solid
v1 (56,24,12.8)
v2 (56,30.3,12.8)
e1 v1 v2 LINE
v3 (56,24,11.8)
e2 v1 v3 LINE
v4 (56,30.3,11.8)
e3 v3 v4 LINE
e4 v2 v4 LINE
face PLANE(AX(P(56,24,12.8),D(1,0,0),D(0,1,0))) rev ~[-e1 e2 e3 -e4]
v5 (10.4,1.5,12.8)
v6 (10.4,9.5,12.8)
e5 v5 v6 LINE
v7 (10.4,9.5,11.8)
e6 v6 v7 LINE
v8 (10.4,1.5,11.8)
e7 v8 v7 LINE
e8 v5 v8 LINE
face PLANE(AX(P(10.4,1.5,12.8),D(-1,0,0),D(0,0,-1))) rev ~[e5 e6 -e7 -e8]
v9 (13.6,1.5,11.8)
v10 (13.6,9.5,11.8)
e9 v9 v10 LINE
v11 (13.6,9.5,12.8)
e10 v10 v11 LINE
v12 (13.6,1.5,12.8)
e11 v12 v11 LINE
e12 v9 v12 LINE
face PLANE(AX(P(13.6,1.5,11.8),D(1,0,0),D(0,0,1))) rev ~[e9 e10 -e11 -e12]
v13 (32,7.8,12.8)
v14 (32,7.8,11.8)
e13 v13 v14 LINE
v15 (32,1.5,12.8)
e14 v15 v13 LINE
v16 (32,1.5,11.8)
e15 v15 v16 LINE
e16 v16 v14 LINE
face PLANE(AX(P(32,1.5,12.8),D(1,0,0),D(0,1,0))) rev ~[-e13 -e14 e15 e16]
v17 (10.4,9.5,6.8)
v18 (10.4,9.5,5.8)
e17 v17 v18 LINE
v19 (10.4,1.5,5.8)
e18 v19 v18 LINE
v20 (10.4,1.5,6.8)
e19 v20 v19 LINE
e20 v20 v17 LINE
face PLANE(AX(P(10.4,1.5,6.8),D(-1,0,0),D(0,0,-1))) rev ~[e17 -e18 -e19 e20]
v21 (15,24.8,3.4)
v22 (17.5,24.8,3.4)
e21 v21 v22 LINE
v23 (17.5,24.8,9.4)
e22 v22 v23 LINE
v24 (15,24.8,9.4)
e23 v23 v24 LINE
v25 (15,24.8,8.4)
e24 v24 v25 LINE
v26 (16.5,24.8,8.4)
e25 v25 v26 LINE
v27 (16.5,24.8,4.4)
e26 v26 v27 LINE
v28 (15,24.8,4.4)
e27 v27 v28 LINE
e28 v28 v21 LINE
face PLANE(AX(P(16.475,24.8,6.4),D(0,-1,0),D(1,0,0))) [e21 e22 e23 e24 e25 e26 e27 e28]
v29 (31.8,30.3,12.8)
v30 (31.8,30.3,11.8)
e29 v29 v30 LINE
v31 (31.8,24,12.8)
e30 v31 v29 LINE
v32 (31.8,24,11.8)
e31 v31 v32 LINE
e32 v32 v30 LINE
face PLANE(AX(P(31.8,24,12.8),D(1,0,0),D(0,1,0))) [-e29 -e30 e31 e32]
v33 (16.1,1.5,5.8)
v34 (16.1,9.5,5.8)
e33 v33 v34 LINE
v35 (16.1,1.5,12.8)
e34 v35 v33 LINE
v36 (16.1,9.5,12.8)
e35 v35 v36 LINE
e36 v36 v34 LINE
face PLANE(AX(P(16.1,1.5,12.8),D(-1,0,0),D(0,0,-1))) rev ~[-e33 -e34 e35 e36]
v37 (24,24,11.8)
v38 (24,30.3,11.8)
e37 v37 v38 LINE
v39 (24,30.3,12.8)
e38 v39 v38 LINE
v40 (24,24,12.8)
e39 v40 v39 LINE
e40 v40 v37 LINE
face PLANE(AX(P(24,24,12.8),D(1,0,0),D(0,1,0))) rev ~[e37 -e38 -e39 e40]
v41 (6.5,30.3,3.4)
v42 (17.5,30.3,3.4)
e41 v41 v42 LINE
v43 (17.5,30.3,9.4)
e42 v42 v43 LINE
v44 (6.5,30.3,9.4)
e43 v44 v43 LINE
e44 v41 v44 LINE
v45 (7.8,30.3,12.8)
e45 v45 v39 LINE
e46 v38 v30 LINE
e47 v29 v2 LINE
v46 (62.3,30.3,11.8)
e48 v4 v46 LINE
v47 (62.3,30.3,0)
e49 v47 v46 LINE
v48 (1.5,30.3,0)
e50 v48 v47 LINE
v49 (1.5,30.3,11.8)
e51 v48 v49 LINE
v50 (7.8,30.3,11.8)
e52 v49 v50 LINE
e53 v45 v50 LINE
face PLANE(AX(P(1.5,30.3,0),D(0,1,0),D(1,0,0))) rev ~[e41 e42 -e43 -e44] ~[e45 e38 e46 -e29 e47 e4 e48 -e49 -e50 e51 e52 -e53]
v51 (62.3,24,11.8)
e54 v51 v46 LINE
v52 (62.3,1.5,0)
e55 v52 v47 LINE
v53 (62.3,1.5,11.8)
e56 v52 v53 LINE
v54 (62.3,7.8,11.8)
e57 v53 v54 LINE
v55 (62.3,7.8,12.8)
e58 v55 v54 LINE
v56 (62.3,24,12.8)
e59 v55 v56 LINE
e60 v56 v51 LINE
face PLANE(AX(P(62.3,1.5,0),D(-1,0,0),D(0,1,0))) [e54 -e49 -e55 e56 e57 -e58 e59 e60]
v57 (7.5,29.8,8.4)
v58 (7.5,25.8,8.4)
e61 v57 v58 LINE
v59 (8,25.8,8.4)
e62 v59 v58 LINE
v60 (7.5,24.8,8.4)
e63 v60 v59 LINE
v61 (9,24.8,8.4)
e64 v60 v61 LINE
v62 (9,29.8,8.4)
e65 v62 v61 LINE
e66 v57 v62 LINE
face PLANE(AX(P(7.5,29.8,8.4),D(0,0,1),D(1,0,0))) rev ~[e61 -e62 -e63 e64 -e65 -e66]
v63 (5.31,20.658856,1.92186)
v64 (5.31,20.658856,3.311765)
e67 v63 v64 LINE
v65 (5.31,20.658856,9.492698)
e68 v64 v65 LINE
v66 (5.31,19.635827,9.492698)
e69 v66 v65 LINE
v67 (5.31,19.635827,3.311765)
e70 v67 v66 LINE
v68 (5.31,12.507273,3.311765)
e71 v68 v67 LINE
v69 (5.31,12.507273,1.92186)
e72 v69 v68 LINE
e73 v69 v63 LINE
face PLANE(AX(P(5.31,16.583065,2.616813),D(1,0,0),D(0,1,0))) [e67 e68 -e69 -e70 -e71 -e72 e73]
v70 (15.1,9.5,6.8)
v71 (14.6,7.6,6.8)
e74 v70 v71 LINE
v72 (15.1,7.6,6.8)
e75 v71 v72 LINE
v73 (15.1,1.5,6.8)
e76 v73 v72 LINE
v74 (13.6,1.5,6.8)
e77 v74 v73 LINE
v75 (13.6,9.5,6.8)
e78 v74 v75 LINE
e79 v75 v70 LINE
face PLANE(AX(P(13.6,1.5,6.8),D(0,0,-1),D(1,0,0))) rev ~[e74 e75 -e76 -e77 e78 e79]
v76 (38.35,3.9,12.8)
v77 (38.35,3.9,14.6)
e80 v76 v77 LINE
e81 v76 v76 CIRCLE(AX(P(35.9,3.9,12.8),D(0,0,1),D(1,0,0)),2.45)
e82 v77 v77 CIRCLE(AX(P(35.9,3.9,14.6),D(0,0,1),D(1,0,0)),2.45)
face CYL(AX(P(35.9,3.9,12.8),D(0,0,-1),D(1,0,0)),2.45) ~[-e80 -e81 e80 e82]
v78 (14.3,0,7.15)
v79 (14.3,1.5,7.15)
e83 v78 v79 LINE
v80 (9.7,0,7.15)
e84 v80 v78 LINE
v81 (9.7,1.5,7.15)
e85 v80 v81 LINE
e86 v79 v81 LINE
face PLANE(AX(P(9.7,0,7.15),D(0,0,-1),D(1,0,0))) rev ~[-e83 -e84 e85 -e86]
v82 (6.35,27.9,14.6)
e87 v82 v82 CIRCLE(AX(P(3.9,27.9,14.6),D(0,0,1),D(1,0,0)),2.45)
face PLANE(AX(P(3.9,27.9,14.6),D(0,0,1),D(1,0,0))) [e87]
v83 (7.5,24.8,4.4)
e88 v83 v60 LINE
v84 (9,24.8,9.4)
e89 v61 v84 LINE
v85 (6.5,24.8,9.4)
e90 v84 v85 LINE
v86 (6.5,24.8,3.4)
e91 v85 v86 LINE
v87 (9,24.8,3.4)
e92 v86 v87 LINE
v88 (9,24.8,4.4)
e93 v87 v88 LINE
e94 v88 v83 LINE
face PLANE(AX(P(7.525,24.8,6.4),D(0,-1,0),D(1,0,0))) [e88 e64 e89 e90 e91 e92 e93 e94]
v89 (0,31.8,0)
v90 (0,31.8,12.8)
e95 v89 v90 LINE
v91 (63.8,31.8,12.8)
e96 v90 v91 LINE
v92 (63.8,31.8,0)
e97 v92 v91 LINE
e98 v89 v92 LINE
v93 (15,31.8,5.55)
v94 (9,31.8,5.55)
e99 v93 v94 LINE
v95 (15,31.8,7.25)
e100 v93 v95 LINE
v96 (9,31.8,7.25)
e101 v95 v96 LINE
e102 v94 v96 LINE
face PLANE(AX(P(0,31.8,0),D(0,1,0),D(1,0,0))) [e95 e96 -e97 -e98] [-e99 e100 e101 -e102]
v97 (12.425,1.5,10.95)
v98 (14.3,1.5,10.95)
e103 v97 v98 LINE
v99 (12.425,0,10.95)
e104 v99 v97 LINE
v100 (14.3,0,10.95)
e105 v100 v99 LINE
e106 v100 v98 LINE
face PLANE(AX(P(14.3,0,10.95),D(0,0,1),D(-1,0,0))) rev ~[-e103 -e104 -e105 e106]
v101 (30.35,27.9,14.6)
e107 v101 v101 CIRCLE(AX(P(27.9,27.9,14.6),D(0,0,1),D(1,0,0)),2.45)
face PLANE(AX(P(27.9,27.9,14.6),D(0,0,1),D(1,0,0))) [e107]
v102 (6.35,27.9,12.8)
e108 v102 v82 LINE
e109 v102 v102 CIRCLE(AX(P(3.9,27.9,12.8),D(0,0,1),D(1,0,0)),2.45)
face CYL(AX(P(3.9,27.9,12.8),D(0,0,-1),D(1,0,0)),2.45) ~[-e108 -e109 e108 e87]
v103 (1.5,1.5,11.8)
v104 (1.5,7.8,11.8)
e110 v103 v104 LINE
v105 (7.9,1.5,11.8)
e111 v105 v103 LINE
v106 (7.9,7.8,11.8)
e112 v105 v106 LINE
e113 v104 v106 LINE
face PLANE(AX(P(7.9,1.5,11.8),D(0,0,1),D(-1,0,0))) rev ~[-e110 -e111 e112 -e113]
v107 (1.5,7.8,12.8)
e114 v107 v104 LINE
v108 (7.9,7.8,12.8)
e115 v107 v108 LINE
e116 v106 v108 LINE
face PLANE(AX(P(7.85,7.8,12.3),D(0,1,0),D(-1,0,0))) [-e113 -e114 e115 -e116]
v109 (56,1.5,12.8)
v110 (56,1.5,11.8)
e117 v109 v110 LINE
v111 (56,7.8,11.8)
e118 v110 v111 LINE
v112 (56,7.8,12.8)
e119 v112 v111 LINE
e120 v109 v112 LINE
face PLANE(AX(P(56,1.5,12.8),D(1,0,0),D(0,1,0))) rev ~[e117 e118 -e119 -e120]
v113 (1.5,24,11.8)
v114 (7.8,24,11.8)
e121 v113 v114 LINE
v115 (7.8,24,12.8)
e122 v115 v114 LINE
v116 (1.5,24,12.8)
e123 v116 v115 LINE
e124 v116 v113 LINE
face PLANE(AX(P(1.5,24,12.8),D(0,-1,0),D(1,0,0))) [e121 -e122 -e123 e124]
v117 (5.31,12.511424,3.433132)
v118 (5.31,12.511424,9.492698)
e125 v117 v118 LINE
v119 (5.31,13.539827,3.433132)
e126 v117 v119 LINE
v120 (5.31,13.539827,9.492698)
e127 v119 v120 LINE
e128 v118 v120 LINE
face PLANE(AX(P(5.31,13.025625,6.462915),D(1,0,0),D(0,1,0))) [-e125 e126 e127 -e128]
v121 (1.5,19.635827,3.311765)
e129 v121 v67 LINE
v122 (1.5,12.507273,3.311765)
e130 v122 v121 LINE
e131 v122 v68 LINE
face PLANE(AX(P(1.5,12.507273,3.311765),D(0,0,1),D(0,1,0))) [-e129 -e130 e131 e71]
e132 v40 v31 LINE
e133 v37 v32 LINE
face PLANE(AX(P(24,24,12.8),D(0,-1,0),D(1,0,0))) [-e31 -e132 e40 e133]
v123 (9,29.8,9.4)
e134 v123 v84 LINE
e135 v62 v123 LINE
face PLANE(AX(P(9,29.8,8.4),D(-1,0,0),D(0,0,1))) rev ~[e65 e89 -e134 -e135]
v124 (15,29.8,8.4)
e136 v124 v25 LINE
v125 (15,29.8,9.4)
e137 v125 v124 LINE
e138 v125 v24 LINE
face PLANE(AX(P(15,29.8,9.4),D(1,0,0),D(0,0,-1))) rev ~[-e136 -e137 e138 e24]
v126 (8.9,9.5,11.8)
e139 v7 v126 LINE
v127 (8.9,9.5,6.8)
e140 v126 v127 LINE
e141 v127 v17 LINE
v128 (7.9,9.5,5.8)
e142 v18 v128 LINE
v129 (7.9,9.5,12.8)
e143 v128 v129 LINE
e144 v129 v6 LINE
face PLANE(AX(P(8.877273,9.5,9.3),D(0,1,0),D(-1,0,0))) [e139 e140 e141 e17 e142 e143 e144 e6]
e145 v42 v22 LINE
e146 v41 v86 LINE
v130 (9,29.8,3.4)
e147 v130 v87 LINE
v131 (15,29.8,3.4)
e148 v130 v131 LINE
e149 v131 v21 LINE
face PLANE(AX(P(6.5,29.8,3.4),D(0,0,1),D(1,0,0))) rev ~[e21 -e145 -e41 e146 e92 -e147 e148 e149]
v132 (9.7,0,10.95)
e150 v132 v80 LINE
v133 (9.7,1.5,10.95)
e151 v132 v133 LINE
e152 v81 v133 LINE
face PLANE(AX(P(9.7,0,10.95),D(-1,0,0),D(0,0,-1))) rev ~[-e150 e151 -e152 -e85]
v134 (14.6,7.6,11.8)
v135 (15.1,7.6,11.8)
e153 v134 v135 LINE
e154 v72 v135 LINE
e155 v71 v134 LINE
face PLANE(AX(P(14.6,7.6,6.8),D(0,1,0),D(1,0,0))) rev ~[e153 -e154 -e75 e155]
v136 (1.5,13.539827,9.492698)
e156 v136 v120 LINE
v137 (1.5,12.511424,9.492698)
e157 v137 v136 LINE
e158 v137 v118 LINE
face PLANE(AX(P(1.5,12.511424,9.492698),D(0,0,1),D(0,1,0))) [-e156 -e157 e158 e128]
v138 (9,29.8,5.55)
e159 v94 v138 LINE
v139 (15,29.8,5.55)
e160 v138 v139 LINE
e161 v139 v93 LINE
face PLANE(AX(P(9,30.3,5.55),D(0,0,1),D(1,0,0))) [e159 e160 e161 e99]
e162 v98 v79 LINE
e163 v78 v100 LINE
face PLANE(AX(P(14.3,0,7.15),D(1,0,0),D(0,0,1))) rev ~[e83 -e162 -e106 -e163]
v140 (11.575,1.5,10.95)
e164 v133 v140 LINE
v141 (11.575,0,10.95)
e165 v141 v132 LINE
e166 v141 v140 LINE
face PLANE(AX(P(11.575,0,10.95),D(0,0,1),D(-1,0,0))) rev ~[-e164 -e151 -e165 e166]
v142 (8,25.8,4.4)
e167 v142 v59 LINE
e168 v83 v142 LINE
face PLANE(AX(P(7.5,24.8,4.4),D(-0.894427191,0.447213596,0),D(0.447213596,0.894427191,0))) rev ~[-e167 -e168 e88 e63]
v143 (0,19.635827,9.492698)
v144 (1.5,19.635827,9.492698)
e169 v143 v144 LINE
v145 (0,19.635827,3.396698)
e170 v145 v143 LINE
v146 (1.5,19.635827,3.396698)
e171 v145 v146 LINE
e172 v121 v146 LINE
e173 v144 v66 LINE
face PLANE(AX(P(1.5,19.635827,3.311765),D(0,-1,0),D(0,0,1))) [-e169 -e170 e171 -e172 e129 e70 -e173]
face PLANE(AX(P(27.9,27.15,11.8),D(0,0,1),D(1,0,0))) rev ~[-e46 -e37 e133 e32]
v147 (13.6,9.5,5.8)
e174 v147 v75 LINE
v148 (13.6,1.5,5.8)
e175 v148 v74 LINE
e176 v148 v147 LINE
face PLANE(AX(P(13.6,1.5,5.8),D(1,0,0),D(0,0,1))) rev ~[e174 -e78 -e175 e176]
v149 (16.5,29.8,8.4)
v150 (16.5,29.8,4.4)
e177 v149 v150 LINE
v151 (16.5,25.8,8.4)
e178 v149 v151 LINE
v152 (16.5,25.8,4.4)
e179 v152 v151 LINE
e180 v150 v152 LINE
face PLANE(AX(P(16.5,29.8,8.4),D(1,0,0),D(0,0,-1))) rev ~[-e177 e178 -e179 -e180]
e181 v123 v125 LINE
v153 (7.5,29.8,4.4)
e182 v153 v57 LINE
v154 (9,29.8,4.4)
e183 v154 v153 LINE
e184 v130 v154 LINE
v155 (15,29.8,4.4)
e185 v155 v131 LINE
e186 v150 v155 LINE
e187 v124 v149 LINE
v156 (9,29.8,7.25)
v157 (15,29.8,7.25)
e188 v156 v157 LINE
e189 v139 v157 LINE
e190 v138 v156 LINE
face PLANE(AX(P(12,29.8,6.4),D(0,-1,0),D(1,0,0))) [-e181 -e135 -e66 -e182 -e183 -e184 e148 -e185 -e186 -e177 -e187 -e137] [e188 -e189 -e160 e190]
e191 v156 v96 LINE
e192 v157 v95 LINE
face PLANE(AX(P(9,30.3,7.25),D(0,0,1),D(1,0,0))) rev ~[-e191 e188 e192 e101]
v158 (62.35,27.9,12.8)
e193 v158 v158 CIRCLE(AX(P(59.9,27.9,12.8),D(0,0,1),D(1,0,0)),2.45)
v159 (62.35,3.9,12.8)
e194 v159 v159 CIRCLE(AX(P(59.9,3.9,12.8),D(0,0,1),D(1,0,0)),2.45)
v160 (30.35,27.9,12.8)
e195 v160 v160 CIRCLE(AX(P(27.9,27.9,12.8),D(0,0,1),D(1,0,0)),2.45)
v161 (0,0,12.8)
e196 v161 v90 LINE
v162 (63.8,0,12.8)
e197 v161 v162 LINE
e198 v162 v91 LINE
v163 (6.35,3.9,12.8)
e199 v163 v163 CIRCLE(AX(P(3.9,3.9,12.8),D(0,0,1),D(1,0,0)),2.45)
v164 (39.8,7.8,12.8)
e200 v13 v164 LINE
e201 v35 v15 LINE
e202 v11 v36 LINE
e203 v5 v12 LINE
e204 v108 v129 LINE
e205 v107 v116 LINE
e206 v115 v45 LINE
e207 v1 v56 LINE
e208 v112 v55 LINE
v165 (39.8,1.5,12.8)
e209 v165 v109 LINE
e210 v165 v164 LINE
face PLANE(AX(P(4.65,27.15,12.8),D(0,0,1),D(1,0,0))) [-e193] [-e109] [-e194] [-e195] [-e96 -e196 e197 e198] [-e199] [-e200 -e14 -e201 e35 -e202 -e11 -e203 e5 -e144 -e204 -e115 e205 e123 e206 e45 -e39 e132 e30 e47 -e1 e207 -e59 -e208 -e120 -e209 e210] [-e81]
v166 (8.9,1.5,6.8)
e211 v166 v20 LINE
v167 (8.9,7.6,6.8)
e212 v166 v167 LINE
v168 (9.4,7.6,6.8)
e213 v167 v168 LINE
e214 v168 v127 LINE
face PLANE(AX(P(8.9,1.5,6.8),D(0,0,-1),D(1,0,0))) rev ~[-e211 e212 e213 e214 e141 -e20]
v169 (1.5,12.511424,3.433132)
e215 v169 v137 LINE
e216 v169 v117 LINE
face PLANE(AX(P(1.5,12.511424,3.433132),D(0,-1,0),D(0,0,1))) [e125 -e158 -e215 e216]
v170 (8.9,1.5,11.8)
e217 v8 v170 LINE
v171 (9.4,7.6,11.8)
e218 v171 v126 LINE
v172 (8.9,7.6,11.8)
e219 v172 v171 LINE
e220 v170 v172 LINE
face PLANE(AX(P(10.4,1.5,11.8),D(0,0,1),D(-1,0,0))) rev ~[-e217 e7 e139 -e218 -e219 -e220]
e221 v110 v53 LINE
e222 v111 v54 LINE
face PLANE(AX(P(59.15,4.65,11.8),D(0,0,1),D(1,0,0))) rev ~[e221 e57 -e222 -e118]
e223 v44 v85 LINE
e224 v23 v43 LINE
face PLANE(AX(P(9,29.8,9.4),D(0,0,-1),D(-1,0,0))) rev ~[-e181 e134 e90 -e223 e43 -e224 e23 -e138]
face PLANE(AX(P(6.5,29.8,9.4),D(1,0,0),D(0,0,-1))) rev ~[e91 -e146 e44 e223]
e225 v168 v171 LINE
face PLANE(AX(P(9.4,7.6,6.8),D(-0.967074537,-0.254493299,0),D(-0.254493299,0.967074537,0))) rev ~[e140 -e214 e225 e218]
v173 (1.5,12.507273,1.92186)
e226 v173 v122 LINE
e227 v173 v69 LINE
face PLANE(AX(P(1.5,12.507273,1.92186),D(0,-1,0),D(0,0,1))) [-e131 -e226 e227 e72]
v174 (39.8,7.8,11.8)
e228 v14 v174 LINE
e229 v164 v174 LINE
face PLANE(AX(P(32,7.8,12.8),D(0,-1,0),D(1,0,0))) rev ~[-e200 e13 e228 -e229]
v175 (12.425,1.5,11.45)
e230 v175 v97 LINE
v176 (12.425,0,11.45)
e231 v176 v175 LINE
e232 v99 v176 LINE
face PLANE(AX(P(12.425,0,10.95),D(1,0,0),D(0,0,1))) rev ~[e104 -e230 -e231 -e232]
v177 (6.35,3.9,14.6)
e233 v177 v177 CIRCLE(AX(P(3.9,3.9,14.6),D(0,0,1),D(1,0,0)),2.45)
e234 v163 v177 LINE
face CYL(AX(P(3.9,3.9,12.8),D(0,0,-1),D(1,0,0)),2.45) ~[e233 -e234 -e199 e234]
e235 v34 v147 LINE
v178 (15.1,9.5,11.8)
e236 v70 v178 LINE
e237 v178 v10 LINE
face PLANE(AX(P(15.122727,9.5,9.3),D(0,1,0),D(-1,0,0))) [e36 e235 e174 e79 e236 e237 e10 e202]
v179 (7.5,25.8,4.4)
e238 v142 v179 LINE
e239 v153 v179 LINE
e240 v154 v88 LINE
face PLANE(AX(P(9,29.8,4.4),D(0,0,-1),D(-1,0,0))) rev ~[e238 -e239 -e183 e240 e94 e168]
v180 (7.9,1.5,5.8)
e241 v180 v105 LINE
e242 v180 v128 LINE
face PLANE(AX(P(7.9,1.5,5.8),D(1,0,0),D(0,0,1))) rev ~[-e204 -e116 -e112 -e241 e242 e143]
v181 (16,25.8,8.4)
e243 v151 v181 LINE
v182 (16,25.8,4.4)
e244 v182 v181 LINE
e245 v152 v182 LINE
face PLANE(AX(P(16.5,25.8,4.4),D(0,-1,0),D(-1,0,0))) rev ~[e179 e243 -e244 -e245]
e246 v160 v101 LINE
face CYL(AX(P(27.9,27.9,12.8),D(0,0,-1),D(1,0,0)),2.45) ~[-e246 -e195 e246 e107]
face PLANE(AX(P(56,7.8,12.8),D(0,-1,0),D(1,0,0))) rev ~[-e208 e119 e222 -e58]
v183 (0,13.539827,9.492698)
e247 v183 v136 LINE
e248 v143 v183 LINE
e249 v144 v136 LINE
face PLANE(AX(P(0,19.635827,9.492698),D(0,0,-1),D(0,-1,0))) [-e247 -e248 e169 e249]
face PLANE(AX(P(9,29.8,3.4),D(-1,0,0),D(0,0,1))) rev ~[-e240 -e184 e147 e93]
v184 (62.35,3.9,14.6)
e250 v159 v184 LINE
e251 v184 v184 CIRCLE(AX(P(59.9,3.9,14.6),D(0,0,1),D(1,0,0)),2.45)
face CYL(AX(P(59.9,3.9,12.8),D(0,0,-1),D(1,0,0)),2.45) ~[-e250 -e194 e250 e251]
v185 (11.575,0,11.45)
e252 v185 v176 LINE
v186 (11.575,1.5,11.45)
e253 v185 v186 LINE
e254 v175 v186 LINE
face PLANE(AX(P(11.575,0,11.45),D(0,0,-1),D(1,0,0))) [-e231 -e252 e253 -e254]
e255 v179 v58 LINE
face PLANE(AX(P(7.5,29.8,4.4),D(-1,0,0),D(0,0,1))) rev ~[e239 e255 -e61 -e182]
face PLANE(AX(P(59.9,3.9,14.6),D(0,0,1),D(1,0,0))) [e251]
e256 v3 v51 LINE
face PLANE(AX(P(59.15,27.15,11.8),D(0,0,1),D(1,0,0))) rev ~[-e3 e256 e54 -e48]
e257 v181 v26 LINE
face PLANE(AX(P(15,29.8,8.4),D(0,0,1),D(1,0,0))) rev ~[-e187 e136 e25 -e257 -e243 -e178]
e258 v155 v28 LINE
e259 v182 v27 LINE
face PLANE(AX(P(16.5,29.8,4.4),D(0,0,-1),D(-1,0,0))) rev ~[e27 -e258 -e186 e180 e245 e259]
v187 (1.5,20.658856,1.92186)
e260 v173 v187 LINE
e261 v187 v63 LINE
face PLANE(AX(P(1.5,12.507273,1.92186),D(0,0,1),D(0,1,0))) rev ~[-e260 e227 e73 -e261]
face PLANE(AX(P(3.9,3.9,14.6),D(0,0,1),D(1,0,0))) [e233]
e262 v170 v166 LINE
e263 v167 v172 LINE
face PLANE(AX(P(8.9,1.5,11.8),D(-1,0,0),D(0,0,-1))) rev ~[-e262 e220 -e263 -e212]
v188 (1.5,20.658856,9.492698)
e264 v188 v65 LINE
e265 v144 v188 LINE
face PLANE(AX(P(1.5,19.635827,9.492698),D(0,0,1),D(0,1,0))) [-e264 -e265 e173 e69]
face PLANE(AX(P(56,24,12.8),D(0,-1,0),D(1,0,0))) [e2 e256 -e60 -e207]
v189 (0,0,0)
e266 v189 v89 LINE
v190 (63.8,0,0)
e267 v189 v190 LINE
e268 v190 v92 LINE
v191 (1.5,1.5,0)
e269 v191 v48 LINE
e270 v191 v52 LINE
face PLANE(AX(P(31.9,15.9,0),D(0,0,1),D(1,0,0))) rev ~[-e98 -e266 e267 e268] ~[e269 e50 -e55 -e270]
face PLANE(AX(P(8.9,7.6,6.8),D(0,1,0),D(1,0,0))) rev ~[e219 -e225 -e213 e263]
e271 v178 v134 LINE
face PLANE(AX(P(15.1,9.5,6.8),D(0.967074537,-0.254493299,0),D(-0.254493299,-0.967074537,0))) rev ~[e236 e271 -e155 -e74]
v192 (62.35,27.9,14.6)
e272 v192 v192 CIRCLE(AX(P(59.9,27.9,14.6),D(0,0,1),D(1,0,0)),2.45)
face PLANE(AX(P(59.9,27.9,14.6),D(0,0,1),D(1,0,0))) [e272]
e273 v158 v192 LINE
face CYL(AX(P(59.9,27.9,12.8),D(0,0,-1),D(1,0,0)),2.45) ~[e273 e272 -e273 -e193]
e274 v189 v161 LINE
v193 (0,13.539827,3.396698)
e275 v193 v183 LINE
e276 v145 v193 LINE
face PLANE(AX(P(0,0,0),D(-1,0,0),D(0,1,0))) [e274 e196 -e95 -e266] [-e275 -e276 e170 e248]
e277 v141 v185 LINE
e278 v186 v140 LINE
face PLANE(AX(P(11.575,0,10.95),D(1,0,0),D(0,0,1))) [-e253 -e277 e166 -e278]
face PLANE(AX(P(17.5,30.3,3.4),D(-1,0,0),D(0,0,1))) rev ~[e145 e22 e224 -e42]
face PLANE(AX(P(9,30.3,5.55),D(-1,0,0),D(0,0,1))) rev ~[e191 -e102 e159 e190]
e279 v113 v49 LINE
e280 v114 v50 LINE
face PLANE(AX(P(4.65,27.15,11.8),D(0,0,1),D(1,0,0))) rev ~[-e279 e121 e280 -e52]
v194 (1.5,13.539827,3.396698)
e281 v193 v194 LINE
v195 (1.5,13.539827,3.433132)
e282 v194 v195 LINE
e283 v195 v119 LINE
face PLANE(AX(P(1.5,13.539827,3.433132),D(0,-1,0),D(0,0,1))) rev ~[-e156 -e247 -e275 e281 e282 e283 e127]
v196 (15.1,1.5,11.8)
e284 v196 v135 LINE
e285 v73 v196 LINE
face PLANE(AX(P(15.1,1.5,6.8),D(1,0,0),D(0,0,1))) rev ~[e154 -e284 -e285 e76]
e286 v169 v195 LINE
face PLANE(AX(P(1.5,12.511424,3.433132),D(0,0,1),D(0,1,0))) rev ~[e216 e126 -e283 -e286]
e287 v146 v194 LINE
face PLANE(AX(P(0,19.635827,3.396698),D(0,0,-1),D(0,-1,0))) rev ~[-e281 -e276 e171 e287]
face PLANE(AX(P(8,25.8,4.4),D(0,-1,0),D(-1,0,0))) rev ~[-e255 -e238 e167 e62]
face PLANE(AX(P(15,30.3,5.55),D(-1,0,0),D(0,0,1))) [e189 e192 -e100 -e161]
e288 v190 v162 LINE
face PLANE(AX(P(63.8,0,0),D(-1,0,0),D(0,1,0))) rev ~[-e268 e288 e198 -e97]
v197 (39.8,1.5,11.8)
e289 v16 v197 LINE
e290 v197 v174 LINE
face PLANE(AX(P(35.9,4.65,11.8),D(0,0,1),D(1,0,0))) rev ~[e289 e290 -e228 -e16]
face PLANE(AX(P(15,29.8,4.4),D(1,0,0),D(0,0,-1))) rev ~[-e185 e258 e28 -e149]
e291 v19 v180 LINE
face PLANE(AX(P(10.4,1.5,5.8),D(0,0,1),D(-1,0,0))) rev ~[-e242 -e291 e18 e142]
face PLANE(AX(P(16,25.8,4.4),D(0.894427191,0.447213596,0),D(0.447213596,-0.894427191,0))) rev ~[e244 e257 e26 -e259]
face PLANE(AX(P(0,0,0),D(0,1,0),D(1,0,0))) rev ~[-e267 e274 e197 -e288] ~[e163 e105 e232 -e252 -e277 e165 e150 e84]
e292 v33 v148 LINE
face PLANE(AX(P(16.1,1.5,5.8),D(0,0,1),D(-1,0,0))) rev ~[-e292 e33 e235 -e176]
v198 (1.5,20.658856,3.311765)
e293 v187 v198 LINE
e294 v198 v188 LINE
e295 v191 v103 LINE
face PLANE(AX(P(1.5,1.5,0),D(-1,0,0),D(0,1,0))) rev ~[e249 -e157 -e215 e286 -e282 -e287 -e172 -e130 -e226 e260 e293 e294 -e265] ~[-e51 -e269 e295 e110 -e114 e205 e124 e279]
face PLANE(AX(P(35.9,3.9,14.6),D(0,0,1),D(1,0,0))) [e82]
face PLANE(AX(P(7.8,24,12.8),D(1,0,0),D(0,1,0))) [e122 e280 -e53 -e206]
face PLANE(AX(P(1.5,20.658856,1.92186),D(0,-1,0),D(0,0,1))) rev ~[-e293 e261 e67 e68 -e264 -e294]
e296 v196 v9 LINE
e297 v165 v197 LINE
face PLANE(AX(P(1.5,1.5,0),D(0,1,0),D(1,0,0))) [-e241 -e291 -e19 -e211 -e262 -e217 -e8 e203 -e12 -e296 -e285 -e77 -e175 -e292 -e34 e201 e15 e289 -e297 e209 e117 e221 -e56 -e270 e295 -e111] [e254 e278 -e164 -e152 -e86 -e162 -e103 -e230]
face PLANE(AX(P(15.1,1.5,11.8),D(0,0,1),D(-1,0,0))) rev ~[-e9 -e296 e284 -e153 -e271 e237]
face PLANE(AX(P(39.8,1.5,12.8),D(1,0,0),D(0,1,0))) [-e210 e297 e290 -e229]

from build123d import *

# Parameters (mm, degrees)
F0_W      = 63.8
F0_H      = 31.8
F0_W_2    = 60.8
F0_H_2    = 28.8
F1_DEPTH  = 12.8
F2_W      = 6.3
F2_H      = 6.3
F2_W_2    = 7.8
F3_DEPTH  = 1
F4_R      = 2.45
F5_DEPTH  = 1.8
F6_W      = 0.85
F6_H      = 0.5
F7_DEPTH  = 25.4
F9_DEPTH  = 8
F11_DEPTH = 5
F12_W     = 0.1
F12_H     = 1
F13_DEPTH = 6.3
F14_W     = 6
F14_H     = 1.7
F15_DEPTH = 2.54
F16_W     = 11
F16_H     = 6
F16_W_2   = 6
F16_H_2   = 1.7
F17_DEPTH = 0.5
F19_DEPTH = 5
F21_DEPTH = 4
F22_W     = 6.096
F22_H     = 6.096
F23_DEPTH = 25.4
F24_W     = 1.0284033013
F24_H     = 6.0595651898
F25_DEPTH = 3.81
F26_W     = 1.0230291676
F26_H     = 6.1809321209
F27_DEPTH = 3.81
F28_W     = 8.1515833735
F28_H     = 1.3899055775
F29_DEPTH = 3.81


# Not quite as in the source:
# - a feature names something its author has since deleted; it is built from what else it names


with BuildPart() as f1:
    # F0 (on Top) → F1 (new body)
    with BuildSketch(Plane.XY):
        with Locations((31.9, 15.9)):
            Rectangle(F0_W, F0_H)
        with Locations((31.9, 15.9)):
            Rectangle(F0_W_2, F0_H_2, mode=Mode.SUBTRACT)
    extrude(amount=F1_DEPTH)

    # F2 (on face) → F3 (join)
    with BuildSketch(Plane.XY.offset(12.8)):
        with Locations((4.65, 27.15)):
            Rectangle(F2_W, F2_H)
        with Locations((4.65, 4.65)):
            Rectangle(F2_W, F2_H)
        with Locations((59.15, 4.65)):
            Rectangle(F2_W, F2_H)
        with Locations((59.15, 27.15)):
            Rectangle(F2_W, F2_H)
        with Locations((27.9, 27.15)):
            Rectangle(F2_W_2, F2_H)
        with Locations((35.9, 4.65)):
            Rectangle(F2_W_2, F2_H)
    extrude(amount=-F3_DEPTH)

    # F4 (on face) → F5 (join)
    with BuildSketch(Plane.XY.offset(12.8)):
        with Locations((3.9, 27.9)):
            Circle(F4_R)
        with Locations((59.9, 27.9)):
            Circle(F4_R)
        with Locations((59.9, 3.9)):
            Circle(F4_R)
        with Locations((3.9, 3.9)):
            Circle(F4_R)
        with Locations((27.9, 27.9)):
            Circle(F4_R)
        with Locations((35.9, 3.9)):
            Circle(F4_R)
    extrude(amount=F5_DEPTH)

    # F6 (on face) → F7 (cut)
    with BuildSketch(Plane.XZ):
        Polygon((11.575, 10.95), (9.7, 10.95), (9.7, 7.15), (14.3, 7.15), (14.3, 10.95), (12.425, 10.95), align=None)
        with Locations((12, 11.2)):
            Rectangle(F6_W, F6_H)
    extrude(amount=-F7_DEPTH, mode=Mode.SUBTRACT)

    # F8 (on face) → F9 (join)
    with BuildSketch(Plane(origin=(0, 1.5, 0), x_dir=(-1, 0, 0), z_dir=(0, 1, 0))):
        Polygon((-13.6, 5.8), (-13.6, 6.8), (-15.1, 6.8), (-15.1, 11.8), (-13.6, 11.8), (-13.6, 12.8), (-16.1, 12.8), (-16.1, 5.8), align=None)
        Polygon((-8.9, 6.8), (-10.4, 6.8), (-10.4, 5.8), (-7.9, 5.8), (-7.9, 12.8), (-10.4, 12.8), (-10.4, 11.8), (-8.9, 11.8), align=None)
    extrude(amount=F9_DEPTH)

    # F10 (on face) → F11 (join, through all)
    with BuildSketch(Plane.XY.offset(6.8)):
        Polygon((14.6, 7.6), (15.1, 7.6), (15.1, 9.5), align=None)
        Polygon((9.4, 7.6), (8.9, 9.5), (8.9, 7.6), align=None)
    extrude(amount=F11_DEPTH)

    # F12 (on face) → F13 (join, through all)
    with BuildSketch(Plane(origin=(0, 1.5, 0), x_dir=(-1, 0, 0), z_dir=(0, 1, 0))):
        with Locations((-7.85, 12.3)):
            Rectangle(F12_W, F12_H)
    extrude(amount=F13_DEPTH)

    # F14 (on face) → F15 (cut)
    with BuildSketch(Plane(origin=(0, 31.8, 0), x_dir=(-1, 0, 0), z_dir=(0, 1, 0))):
        with Locations((-12, 6.4)):
            Rectangle(F14_W, F14_H)
    extrude(amount=-F15_DEPTH, mode=Mode.SUBTRACT)

    # F16 (on face) → F17 (join)
    with BuildSketch(Plane.XZ.offset(-30.3)):
        with Locations((12, 6.4)):
            Rectangle(F16_W, F16_H)
        with Locations((12, 6.4)):
            Rectangle(F16_W_2, F16_H_2, mode=Mode.SUBTRACT)
    extrude(amount=F17_DEPTH)

    # F18 (on face) → F19 (join)
    with BuildSketch(Plane.XZ.offset(-29.8)):
        Polygon((9, 9.4), (6.5, 9.4), (6.5, 3.4), (9, 3.4), (9, 4.4), (7.5, 4.4), (7.5, 8.4), (9, 8.4), align=None)
        Polygon((17.5, 9.4), (15, 9.4), (15, 8.4), (16.5, 8.4), (16.5, 4.4), (15, 4.4), (15, 3.4), (17.5, 3.4), align=None)
    extrude(amount=F19_DEPTH)

    # F20 (on face) → F21 (join, through all)
    with BuildSketch(Plane.XY.offset(4.4)):
        Polygon((7.5, 25.8), (7.5, 24.8), (8, 25.8), align=None)
        Polygon((16, 25.8), (16.5, 24.8), (16.5, 25.8), align=None)
    extrude(amount=F21_DEPTH)

    # F22 (on face) → F23 (cut)
    with BuildSketch(Plane(origin=(0, 0, 0), x_dir=(0, -1, 0), z_dir=(-1, 0, 0))):
        with Locations((-16.5878270902, 6.4446975011)):
            Rectangle(F22_W, F22_H)
    extrude(amount=-F23_DEPTH, mode=Mode.SUBTRACT)

    # F24 (on face) → F25 (join)
    with BuildSketch(Plane.YZ.offset(1.5)):
        with Locations((13.0256254396, 6.4629149062)):
            Rectangle(F24_W, F24_H)
    extrude(amount=F25_DEPTH)

    # F26 (on face) → F27 (join)
    with BuildSketch(Plane.YZ.offset(1.5)):
        with Locations((20.147341674, 6.4022314407)):
            Rectangle(F26_W, F26_H)
    extrude(amount=F27_DEPTH)

    # F28 (on face) → F29 (join)
    with BuildSketch(Plane.YZ.offset(1.5)):
        with Locations((16.583064571, 2.6168125914)):
            Rectangle(F28_W, F28_H)
    extrude(amount=F29_DEPTH)


solid = f1.part
